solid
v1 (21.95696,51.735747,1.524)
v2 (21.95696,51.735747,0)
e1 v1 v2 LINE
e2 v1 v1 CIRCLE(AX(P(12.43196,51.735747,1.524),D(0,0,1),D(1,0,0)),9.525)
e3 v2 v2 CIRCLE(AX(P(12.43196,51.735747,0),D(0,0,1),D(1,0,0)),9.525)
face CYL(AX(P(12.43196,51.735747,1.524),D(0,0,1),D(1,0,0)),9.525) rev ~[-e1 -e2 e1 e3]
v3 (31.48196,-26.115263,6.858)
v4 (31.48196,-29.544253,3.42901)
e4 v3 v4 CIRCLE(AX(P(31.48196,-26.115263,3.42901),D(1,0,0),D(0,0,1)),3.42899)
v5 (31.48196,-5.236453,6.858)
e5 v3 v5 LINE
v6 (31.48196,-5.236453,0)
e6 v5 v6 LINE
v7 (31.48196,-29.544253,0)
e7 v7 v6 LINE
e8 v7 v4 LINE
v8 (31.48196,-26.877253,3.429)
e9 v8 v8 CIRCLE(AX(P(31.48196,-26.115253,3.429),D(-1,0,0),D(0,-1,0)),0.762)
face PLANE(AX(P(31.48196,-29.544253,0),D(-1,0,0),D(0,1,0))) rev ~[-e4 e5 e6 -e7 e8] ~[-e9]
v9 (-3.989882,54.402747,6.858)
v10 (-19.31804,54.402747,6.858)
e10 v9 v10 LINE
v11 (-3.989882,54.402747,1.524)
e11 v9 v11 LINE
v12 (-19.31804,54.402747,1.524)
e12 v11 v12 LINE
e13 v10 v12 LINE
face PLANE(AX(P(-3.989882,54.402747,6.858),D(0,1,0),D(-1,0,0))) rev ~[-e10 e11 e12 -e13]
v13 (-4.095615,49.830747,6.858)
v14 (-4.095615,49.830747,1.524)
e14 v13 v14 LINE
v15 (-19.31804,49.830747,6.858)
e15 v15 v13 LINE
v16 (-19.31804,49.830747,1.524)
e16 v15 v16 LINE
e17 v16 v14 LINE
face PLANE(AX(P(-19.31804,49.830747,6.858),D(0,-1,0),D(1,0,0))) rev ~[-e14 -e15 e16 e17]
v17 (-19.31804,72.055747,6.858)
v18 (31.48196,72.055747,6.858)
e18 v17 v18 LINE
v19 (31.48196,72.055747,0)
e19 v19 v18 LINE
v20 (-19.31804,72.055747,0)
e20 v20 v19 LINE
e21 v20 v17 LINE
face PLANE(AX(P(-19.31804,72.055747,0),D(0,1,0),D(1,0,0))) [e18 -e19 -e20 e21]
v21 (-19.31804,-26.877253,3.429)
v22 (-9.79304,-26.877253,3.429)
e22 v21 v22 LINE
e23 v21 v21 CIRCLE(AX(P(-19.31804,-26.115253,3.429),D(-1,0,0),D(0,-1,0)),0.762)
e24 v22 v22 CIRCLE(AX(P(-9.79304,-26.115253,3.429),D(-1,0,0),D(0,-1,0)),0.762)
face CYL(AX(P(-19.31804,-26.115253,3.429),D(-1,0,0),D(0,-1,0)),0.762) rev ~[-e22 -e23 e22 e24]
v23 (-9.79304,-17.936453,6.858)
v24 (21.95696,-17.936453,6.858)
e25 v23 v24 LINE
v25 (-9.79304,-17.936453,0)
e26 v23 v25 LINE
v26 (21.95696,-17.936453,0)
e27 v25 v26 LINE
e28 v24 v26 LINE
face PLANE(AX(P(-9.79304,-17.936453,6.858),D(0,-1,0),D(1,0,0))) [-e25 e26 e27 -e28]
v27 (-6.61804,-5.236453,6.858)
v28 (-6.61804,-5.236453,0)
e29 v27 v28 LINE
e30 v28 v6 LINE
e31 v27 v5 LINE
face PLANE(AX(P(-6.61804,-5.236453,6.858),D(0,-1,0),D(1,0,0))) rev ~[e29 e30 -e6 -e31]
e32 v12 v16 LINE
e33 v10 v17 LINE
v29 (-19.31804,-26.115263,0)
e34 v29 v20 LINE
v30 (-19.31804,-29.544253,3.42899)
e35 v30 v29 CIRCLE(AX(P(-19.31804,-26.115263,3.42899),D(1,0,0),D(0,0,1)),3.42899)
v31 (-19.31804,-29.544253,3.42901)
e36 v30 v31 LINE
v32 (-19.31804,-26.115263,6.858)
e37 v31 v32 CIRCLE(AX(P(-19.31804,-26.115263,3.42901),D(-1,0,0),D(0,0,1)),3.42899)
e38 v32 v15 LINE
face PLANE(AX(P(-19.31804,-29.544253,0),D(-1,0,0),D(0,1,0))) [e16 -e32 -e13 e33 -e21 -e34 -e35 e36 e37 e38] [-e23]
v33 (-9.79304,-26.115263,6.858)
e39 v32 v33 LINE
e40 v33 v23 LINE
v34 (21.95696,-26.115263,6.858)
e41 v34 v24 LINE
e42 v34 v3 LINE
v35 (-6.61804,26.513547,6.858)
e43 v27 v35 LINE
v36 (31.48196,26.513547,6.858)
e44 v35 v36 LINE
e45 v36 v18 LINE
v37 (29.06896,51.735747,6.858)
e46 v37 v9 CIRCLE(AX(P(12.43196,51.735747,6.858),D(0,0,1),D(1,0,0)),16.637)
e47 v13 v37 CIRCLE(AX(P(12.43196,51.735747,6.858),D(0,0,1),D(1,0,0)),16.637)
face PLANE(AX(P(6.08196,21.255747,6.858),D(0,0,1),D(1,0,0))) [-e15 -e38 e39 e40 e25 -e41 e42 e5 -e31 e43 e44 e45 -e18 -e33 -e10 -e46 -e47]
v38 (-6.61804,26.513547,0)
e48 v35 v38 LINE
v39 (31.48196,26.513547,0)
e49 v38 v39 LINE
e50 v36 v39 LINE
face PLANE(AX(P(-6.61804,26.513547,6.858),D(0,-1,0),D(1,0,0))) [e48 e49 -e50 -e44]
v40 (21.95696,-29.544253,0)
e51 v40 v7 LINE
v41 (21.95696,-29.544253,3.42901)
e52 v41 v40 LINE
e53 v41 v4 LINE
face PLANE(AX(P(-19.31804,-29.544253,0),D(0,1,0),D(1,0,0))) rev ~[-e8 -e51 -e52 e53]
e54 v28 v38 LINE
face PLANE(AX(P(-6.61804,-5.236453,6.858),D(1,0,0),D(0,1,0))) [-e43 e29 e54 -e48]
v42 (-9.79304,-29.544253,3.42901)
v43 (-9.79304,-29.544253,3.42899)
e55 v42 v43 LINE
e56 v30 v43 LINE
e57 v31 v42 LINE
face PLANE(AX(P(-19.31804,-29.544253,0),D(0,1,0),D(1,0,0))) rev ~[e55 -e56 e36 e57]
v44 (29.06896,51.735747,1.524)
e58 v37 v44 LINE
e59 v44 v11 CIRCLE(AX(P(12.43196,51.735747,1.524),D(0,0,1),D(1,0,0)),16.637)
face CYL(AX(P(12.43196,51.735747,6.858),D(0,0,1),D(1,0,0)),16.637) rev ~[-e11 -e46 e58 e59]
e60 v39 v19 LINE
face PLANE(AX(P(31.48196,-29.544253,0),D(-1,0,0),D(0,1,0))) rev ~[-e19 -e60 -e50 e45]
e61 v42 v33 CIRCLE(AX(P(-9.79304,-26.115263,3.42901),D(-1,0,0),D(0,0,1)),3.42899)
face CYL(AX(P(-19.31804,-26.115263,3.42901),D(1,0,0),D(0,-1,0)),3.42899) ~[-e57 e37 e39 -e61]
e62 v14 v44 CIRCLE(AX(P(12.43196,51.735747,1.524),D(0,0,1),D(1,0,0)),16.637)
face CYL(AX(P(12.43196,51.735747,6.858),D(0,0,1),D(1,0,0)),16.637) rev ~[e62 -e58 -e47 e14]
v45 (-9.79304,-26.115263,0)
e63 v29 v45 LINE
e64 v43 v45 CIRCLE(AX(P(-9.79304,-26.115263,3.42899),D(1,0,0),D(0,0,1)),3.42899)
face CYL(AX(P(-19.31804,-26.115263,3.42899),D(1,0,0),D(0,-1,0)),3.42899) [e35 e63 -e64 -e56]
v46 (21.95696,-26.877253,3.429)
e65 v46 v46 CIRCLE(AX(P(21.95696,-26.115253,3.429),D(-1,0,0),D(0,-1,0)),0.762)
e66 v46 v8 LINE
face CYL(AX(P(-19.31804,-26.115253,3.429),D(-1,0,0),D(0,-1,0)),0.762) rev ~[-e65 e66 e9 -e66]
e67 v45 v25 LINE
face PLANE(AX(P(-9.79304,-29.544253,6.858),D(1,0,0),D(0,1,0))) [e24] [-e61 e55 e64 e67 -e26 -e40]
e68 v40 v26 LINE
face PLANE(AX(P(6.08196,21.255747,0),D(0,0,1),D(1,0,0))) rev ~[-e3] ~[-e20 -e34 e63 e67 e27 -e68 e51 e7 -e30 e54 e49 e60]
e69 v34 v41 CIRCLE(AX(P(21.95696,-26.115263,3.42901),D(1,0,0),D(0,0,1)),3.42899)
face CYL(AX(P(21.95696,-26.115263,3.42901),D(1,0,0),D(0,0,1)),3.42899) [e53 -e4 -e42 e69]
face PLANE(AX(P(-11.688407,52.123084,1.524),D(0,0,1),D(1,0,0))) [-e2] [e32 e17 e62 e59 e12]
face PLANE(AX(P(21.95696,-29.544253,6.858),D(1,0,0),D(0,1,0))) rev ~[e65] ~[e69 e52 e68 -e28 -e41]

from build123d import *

# Parameters (mm, degrees)
F0_W      = 50.8
F0_H      = 101.6
F1_DEPTH  = 6.858
F2_R      = 16.637
F3_DEPTH  = 5.334
F4_R      = 9.525
F5_DEPTH  = 25.4
F6_W      = 31.75
F6_H      = 11.6078
F7_DEPTH  = 25.4
F8_W      = 38.1
F8_H      = 31.75
F9_DEPTH  = 25.4
F10_R     = 3.42899
F12_DEPTH = 5.334
F13_R     = 0.762
F14_DEPTH = 50.8


# Not quite as in the source:
# - a fillet or chamfer is up to 0.001 mm smaller than in the source, because OpenCascade refuses the exact size


with BuildPart() as f1:
    # F0 (on Top) → F1 (new body)
    with BuildSketch(Plane.XY):
        with Locations((6.0819597751, 21.255746996)):
            Rectangle(F0_W, F0_H)
    extrude(amount=F1_DEPTH)

    # F2 (on face) → F3 (cut)
    with BuildSketch(Plane.XY.offset(6.858)):
        with Locations((12.4319597751, 51.735746996)):
            Circle(F2_R)
    extrude(amount=-F3_DEPTH, mode=Mode.SUBTRACT)

    # F4 (on face) → F5 (cut)
    with BuildSketch(Plane.XY.offset(1.524)):
        with Locations((12.4319597751, 51.735746996)):
            Circle(F4_R)
    extrude(amount=-F5_DEPTH, mode=Mode.SUBTRACT)

    # F6 (on face) → F7 (cut)
    with BuildSketch(Plane.XY.offset(6.858)):
        with Locations((6.0819597751, -23.740353004)):
            Rectangle(F6_W, F6_H)
    extrude(amount=-F7_DEPTH, mode=Mode.SUBTRACT)

    # F8 (on face) → F9 (cut)
    with BuildSketch(Plane.XY.offset(6.858)):
        with Locations((12.4319597751, 10.638546996)):
            Rectangle(F8_W, F8_H)
    extrude(amount=-F9_DEPTH, mode=Mode.SUBTRACT)

    # F10 (radius 3.429 in the source; OpenCascade refuses exactly that, so slightly less here)
    f10_edges = [f1.edges().sort_by_distance(p)[0] for p in [
        (-14.55554, -29.544253, 6.858),
        (26.71946, -29.544253, 6.858),
        (-14.55554, -29.544253, 0),
    ]]
    fillet(f10_edges, radius=F10_R)

    # F11 (on face) → F12 (cut)
    with BuildSketch(Plane.XY.offset(6.858)):
        with BuildLine():
            Line((-3.9898817782, 54.402746996), (-19.3180402249, 54.402746996))
            Line((-19.3180402249, 54.402746996), (-19.3180402249, 49.830746996))
            Line((-19.3180402249, 49.830746996), (-4.0956154857, 49.830746996))
            ThreePointArc((-4.0956154857, 49.830746996), (-4.2005930385, 52.1203973622), (-3.9898817782, 54.402746996))
        make_face()
    extrude(amount=-F12_DEPTH, mode=Mode.SUBTRACT)

    # F13 (on face) → F14 (cut)
    with BuildSketch(Plane(origin=(-19.3180402249, 0, 0), x_dir=(0, -1, 0), z_dir=(-1, 0, 0))):
        with Locations((26.115253004, 3.429)):
            Circle(F13_R)
    extrude(amount=-F14_DEPTH, mode=Mode.SUBTRACT)


solid = f1.part
